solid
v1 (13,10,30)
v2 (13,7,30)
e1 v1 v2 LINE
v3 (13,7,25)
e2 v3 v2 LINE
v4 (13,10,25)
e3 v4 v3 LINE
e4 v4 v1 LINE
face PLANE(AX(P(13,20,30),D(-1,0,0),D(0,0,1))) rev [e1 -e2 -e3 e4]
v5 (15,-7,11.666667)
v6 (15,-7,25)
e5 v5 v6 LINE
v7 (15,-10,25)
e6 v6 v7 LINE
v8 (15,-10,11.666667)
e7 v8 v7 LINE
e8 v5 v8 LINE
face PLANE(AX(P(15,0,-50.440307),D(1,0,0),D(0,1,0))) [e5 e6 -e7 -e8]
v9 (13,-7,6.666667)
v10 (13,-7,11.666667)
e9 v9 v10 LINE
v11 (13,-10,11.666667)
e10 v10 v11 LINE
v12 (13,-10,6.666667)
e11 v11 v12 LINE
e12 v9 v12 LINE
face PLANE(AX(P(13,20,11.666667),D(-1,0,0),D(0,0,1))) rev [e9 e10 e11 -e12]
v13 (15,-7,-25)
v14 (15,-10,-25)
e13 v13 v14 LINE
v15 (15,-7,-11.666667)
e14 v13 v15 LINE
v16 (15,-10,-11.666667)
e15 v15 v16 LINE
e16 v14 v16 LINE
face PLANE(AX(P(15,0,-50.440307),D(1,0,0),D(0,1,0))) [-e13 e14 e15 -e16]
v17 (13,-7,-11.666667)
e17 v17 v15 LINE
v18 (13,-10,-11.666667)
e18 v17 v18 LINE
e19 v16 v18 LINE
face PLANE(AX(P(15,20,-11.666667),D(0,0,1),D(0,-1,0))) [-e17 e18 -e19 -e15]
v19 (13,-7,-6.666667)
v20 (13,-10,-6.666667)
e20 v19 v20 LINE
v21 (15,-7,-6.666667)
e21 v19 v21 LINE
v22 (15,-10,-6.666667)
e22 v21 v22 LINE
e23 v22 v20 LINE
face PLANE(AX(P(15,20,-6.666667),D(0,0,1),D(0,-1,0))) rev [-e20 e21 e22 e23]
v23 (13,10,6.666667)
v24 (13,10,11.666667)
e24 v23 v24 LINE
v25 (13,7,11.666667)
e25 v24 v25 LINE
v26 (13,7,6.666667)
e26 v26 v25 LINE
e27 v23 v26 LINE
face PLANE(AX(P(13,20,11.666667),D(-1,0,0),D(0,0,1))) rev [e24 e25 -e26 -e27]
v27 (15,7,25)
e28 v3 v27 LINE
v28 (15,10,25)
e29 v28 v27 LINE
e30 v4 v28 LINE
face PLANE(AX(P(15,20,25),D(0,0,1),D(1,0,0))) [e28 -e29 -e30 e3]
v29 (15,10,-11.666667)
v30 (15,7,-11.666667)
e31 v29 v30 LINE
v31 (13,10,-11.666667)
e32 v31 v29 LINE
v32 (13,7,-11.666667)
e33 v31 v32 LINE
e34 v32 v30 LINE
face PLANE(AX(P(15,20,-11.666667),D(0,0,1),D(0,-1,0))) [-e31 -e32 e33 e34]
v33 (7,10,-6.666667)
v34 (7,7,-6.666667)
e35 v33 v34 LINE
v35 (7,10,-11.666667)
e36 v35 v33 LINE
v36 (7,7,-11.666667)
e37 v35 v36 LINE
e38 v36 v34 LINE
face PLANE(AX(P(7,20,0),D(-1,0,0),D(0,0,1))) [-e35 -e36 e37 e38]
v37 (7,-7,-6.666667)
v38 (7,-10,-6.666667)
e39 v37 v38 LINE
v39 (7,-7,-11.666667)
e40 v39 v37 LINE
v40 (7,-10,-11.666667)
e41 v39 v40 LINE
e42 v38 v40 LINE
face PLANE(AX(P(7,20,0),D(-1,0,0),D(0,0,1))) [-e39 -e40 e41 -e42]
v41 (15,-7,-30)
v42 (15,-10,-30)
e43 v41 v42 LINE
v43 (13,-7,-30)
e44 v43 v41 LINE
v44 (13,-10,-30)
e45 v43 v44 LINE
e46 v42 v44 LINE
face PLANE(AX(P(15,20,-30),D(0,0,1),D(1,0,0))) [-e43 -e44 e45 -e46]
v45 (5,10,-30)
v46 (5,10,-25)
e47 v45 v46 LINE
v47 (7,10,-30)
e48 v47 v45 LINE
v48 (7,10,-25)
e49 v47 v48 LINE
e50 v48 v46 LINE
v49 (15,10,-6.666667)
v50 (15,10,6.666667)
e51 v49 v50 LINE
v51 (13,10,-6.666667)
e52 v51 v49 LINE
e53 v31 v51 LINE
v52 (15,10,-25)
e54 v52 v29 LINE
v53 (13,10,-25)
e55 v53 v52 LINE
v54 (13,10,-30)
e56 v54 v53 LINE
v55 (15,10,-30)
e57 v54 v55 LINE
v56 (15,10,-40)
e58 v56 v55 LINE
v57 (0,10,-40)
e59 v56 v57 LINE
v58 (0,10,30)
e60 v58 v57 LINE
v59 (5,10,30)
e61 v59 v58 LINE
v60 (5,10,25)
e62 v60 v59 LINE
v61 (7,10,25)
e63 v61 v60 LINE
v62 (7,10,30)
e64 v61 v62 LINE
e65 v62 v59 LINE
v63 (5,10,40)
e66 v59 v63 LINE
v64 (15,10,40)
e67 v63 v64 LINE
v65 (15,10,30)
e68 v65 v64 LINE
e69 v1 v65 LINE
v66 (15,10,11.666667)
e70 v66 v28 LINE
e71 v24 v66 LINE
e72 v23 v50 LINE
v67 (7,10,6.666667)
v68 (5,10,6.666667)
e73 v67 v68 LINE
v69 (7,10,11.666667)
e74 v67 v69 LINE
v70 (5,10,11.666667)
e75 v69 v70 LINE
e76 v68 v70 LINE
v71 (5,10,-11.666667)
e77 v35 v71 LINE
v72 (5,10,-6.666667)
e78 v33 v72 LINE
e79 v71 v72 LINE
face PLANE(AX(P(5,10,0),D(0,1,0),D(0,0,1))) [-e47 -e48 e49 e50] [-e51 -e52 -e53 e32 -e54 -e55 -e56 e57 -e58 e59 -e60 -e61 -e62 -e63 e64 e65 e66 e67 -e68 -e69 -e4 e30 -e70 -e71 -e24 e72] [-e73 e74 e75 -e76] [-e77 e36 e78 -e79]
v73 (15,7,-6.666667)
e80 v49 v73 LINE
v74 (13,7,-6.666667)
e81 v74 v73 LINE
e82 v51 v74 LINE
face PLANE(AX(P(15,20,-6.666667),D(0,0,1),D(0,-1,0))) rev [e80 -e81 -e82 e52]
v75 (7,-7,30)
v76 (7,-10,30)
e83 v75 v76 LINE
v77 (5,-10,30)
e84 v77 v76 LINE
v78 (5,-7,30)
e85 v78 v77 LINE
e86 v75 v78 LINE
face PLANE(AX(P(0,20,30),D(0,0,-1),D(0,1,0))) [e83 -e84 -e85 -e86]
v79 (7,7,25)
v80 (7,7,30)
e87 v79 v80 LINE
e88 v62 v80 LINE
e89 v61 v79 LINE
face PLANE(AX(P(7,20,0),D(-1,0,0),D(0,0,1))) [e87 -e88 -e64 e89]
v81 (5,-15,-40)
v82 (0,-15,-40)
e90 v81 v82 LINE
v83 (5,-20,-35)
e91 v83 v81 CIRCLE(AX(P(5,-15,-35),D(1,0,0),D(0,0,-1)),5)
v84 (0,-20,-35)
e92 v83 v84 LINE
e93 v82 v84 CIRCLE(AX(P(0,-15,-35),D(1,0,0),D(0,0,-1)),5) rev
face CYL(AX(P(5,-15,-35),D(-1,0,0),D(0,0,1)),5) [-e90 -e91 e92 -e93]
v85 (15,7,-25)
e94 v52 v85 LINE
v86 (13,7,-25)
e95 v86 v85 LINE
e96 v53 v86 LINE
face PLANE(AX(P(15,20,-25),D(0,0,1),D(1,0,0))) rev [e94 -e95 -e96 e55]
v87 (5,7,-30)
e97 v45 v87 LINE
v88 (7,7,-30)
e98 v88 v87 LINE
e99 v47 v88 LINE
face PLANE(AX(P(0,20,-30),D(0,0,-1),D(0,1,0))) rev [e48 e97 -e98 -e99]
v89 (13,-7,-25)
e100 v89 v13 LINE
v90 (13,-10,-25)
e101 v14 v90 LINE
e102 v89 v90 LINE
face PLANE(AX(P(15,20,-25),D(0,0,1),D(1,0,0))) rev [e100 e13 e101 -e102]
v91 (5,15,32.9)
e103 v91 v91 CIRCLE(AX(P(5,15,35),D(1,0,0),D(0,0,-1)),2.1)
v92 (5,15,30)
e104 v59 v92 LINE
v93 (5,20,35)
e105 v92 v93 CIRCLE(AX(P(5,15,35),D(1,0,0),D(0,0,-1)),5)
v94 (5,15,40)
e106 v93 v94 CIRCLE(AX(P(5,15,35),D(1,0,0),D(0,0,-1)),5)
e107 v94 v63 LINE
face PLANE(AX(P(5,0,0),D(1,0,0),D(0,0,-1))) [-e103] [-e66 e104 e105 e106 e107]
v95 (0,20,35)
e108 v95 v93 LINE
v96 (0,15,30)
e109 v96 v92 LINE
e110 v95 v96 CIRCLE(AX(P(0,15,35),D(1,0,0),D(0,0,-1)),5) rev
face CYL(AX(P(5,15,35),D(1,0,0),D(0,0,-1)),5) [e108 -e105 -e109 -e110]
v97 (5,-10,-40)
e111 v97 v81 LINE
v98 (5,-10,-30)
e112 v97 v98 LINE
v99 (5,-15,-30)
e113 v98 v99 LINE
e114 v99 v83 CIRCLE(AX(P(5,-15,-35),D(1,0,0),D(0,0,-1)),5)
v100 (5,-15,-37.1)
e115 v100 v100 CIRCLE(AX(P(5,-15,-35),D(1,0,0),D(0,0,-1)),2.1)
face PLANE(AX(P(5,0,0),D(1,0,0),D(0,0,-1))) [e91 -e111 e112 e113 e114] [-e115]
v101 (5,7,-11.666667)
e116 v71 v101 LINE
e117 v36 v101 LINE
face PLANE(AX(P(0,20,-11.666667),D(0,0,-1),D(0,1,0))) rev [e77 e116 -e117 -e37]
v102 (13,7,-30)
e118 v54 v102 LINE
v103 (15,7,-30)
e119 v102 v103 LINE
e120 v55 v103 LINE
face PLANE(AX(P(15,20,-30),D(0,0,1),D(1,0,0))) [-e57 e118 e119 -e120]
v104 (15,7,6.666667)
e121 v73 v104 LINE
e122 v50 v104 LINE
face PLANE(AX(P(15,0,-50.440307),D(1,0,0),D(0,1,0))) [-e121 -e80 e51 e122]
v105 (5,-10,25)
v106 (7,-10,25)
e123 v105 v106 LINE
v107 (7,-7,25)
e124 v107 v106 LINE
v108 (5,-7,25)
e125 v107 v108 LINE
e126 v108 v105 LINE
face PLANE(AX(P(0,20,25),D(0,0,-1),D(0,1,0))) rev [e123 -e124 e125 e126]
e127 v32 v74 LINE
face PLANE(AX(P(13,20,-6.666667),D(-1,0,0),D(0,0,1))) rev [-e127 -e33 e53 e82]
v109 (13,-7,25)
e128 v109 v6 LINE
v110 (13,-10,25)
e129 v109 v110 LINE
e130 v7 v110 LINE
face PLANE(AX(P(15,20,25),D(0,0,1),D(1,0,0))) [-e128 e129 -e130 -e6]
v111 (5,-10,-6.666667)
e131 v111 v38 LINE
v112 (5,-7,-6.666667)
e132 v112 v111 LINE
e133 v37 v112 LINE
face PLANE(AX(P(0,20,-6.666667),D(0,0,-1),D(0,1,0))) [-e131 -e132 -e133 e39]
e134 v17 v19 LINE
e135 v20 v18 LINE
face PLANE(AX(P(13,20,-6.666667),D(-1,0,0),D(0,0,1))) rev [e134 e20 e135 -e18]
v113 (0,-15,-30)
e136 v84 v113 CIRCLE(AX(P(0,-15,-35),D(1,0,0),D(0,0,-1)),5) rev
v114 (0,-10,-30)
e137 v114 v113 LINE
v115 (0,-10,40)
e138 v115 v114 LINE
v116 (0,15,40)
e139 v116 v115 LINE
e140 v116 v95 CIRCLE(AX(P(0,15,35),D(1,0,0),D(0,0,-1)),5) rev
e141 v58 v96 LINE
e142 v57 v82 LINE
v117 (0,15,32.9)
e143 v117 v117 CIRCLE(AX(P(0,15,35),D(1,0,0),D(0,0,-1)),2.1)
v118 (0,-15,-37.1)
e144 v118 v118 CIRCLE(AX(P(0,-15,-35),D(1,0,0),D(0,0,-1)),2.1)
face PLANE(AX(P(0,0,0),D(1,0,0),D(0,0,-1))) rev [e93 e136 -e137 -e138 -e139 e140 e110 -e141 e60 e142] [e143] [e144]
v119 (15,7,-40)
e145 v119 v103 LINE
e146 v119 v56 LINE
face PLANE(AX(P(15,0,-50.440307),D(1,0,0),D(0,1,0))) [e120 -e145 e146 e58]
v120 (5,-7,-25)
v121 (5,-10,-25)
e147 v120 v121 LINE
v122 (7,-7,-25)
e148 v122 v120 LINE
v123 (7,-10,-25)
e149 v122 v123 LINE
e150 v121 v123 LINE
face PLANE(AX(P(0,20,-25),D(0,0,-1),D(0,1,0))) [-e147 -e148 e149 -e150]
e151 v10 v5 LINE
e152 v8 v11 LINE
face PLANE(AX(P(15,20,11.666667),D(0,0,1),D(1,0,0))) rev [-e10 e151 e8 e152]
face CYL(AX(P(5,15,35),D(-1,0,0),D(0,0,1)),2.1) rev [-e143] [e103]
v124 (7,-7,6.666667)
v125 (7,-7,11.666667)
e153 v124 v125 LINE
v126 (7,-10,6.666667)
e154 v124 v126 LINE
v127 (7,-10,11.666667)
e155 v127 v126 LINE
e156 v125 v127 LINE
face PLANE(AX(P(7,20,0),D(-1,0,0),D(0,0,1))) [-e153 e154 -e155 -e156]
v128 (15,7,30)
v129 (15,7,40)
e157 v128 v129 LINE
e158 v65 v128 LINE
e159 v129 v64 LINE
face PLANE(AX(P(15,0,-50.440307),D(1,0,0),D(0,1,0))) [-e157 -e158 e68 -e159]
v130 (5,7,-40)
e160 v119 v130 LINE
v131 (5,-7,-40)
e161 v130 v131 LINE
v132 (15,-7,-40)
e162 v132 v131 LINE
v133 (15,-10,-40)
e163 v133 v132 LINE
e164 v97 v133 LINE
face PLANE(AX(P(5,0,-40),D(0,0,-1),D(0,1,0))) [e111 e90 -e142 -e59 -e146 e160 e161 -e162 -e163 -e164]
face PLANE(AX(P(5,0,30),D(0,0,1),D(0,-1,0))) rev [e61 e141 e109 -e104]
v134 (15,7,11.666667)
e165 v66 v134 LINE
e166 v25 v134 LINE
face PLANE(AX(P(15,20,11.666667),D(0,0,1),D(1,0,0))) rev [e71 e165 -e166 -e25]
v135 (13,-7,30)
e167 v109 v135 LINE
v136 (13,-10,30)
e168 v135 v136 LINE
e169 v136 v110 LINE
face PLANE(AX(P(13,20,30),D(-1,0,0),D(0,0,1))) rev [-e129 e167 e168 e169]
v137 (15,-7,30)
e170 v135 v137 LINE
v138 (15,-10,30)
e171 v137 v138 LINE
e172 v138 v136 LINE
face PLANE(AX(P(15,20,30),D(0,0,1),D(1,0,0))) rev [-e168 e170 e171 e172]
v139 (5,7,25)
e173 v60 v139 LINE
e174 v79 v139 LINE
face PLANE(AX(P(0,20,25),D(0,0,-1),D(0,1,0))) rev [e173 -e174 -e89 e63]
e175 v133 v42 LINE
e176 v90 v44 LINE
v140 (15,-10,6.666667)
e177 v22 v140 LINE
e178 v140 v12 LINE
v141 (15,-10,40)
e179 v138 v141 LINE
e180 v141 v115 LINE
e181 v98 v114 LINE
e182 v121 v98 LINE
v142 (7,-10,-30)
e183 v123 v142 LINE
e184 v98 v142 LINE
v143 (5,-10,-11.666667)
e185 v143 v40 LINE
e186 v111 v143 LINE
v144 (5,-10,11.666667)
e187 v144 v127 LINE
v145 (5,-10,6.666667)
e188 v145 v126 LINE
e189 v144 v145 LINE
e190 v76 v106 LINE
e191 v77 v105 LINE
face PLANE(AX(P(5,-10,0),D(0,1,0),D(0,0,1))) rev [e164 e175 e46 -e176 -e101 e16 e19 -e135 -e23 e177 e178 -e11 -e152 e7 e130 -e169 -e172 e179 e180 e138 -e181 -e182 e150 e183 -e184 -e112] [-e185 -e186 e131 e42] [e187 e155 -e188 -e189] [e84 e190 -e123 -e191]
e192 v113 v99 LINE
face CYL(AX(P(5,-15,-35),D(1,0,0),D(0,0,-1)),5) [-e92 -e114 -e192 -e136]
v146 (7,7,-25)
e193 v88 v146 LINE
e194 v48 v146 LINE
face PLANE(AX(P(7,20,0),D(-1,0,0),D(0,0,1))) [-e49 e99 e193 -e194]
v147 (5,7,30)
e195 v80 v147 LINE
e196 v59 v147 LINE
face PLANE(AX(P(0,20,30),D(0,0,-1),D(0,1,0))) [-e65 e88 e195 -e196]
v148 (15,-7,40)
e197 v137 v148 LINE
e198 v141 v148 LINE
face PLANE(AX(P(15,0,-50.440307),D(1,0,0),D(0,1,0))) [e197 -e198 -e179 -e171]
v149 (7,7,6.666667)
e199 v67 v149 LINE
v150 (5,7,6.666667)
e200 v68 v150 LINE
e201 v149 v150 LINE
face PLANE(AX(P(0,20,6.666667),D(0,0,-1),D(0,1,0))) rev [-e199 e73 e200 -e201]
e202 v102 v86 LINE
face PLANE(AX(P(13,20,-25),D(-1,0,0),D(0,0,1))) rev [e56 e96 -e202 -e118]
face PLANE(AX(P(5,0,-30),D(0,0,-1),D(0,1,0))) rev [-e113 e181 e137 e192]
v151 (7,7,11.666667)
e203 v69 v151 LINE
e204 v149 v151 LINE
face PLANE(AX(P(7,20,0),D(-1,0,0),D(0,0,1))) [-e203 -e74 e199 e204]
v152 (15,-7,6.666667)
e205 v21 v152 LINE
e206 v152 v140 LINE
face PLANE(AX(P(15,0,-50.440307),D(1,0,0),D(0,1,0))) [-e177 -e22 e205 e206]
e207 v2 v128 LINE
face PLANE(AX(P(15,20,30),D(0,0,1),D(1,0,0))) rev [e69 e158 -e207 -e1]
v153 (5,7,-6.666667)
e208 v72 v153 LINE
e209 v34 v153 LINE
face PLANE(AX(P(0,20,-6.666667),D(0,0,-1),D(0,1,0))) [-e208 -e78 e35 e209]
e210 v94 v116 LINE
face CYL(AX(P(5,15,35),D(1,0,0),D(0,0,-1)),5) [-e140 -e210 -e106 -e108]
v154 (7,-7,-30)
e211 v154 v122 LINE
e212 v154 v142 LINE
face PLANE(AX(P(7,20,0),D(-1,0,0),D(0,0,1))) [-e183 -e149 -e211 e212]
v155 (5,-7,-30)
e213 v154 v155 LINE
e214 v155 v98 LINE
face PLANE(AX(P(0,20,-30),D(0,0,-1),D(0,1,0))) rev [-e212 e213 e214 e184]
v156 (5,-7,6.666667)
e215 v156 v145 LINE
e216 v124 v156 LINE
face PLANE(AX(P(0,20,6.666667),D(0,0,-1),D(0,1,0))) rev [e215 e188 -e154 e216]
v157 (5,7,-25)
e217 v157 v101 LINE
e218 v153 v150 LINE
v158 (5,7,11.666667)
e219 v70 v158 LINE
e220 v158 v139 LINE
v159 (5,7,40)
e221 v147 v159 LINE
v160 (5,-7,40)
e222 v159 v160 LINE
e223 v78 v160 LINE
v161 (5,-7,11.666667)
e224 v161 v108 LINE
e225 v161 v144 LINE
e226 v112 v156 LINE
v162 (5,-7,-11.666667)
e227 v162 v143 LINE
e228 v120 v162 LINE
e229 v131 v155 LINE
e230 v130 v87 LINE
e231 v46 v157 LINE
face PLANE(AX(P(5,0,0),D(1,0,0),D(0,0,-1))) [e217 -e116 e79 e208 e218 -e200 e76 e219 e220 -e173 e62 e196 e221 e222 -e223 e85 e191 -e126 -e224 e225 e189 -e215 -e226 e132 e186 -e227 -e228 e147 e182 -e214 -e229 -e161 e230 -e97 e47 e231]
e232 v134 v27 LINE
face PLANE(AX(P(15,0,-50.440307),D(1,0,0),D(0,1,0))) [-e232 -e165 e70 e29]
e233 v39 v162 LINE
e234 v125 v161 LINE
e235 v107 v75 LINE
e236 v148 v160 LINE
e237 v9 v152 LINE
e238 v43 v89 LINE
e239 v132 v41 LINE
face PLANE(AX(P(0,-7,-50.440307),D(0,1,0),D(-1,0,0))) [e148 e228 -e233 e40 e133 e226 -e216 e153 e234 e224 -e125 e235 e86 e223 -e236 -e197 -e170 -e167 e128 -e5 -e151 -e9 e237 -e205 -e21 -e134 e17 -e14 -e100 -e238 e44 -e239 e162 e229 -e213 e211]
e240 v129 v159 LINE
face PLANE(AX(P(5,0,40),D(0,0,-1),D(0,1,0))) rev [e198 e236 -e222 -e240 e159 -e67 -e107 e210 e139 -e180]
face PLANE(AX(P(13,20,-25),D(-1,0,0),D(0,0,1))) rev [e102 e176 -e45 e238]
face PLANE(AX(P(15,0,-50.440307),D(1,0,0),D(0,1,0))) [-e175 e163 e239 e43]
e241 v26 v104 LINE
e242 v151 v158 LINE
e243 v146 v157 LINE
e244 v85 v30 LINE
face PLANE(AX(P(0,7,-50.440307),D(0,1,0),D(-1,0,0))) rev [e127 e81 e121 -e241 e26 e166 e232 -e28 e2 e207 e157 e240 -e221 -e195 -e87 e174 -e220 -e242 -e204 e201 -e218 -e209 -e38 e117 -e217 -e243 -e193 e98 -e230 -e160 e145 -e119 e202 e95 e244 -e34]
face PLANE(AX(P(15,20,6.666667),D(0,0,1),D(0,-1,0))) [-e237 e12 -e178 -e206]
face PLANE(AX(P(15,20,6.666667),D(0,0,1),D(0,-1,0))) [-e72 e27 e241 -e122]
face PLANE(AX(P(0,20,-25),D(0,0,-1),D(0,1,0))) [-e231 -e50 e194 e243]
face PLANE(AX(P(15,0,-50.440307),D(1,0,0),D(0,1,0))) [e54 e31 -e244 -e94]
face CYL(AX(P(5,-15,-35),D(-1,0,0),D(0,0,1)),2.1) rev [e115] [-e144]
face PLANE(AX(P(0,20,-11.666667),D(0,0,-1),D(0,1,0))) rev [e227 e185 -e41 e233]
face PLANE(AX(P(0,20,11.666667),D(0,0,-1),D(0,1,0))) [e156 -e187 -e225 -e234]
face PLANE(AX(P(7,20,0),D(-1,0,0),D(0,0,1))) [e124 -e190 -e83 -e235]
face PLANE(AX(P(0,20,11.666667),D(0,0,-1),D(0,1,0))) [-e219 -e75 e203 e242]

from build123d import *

# Parameters (mm, degrees)
SKETCH1_W           = 80
SKETCH1_H           = 20
SKETCH1_W_2         = 10
SKETCH1_H_2         = 10
SKETCH1_R           = 2.1
BOSS_EXTRUDE1_DEPTH = 5
SKETCH2_W           = 10
SKETCH2_H           = 3
BOSS_EXTRUDE2_DEPTH = 80
FILLET1_R           = 5
SKETCH3_W           = 2
SKETCH3_H           = 5
CUT_EXTRUDE1_DEPTH  = 53.201532545


with BuildPart() as part:
    # Sketch1 → Boss-Extrude1 (new body)
    # profile 1 of 3: a face of its own
    with BuildSketch(Plane(origin=(0, 0, 0), x_dir=(0, 0, -1), z_dir=(1, 0, 0))):
        Rectangle(SKETCH1_W, SKETCH1_H)
    # profile 2 of 3: a face of its own
    with BuildSketch(Plane(origin=(0, 0, 0), x_dir=(0, 0, -1), z_dir=(1, 0, 0))):
        with Locations((-35, 15)):
            Rectangle(SKETCH1_W_2, SKETCH1_H_2)
        with Locations((-35, 15)):
            Circle(SKETCH1_R, mode=Mode.SUBTRACT)
    # profile 3 of 3: a face of its own
    with BuildSketch(Plane(origin=(0, 0, 0), x_dir=(0, 0, -1), z_dir=(1, 0, 0))):
        with Locations((35, -15)):
            Rectangle(SKETCH1_W_2, SKETCH1_H_2)
        with Locations((35, -15)):
            Circle(SKETCH1_R, mode=Mode.SUBTRACT)
    extrude(amount=BOSS_EXTRUDE1_DEPTH)

    # Sketch2 → Boss-Extrude2 (add)
    with BuildSketch(Plane.XY.offset(40)):
        with Locations((10, 8.5)):
            Rectangle(SKETCH2_W, SKETCH2_H)
        with Locations((10, -8.5)):
            Rectangle(SKETCH2_W, SKETCH2_H)
    extrude(amount=-BOSS_EXTRUDE2_DEPTH)

    # Fillet1
    fillet1_edges = [part.edges().sort_by_distance(p)[0] for p in [
        (2.5, 20, 30),
        (2.5, 20, 40),
        (2.5, -20, -40),
        (2.5, -20, -30),
    ]]
    fillet(fillet1_edges, radius=FILLET1_R - 0.0001)  # a hair under: the kernel refuses the full size

    # Sketch3 → Cut-Extrude1 (cut, through all)
    with BuildSketch(Plane.XZ.offset(10)):
        with Locations((6, 27.5)):
            Rectangle(SKETCH3_W, SKETCH3_H)
        with Locations((6, 9.166666667)):
            Rectangle(SKETCH3_W, SKETCH3_H)
        with Locations((6, -9.166666667)):
            Rectangle(SKETCH3_W, SKETCH3_H)
        with Locations((6, -27.5)):
            Rectangle(SKETCH3_W, SKETCH3_H)
        with Locations((14, 27.5)):
            Rectangle(SKETCH3_W, SKETCH3_H)
        with Locations((14, 9.166666667)):
            Rectangle(SKETCH3_W, SKETCH3_H)
        with Locations((14, -9.166666667)):
            Rectangle(SKETCH3_W, SKETCH3_H)
        with Locations((14, -27.5)):
            Rectangle(SKETCH3_W, SKETCH3_H)
    extrude(amount=-CUT_EXTRUDE1_DEPTH, mode=Mode.SUBTRACT)


solid = part.part
